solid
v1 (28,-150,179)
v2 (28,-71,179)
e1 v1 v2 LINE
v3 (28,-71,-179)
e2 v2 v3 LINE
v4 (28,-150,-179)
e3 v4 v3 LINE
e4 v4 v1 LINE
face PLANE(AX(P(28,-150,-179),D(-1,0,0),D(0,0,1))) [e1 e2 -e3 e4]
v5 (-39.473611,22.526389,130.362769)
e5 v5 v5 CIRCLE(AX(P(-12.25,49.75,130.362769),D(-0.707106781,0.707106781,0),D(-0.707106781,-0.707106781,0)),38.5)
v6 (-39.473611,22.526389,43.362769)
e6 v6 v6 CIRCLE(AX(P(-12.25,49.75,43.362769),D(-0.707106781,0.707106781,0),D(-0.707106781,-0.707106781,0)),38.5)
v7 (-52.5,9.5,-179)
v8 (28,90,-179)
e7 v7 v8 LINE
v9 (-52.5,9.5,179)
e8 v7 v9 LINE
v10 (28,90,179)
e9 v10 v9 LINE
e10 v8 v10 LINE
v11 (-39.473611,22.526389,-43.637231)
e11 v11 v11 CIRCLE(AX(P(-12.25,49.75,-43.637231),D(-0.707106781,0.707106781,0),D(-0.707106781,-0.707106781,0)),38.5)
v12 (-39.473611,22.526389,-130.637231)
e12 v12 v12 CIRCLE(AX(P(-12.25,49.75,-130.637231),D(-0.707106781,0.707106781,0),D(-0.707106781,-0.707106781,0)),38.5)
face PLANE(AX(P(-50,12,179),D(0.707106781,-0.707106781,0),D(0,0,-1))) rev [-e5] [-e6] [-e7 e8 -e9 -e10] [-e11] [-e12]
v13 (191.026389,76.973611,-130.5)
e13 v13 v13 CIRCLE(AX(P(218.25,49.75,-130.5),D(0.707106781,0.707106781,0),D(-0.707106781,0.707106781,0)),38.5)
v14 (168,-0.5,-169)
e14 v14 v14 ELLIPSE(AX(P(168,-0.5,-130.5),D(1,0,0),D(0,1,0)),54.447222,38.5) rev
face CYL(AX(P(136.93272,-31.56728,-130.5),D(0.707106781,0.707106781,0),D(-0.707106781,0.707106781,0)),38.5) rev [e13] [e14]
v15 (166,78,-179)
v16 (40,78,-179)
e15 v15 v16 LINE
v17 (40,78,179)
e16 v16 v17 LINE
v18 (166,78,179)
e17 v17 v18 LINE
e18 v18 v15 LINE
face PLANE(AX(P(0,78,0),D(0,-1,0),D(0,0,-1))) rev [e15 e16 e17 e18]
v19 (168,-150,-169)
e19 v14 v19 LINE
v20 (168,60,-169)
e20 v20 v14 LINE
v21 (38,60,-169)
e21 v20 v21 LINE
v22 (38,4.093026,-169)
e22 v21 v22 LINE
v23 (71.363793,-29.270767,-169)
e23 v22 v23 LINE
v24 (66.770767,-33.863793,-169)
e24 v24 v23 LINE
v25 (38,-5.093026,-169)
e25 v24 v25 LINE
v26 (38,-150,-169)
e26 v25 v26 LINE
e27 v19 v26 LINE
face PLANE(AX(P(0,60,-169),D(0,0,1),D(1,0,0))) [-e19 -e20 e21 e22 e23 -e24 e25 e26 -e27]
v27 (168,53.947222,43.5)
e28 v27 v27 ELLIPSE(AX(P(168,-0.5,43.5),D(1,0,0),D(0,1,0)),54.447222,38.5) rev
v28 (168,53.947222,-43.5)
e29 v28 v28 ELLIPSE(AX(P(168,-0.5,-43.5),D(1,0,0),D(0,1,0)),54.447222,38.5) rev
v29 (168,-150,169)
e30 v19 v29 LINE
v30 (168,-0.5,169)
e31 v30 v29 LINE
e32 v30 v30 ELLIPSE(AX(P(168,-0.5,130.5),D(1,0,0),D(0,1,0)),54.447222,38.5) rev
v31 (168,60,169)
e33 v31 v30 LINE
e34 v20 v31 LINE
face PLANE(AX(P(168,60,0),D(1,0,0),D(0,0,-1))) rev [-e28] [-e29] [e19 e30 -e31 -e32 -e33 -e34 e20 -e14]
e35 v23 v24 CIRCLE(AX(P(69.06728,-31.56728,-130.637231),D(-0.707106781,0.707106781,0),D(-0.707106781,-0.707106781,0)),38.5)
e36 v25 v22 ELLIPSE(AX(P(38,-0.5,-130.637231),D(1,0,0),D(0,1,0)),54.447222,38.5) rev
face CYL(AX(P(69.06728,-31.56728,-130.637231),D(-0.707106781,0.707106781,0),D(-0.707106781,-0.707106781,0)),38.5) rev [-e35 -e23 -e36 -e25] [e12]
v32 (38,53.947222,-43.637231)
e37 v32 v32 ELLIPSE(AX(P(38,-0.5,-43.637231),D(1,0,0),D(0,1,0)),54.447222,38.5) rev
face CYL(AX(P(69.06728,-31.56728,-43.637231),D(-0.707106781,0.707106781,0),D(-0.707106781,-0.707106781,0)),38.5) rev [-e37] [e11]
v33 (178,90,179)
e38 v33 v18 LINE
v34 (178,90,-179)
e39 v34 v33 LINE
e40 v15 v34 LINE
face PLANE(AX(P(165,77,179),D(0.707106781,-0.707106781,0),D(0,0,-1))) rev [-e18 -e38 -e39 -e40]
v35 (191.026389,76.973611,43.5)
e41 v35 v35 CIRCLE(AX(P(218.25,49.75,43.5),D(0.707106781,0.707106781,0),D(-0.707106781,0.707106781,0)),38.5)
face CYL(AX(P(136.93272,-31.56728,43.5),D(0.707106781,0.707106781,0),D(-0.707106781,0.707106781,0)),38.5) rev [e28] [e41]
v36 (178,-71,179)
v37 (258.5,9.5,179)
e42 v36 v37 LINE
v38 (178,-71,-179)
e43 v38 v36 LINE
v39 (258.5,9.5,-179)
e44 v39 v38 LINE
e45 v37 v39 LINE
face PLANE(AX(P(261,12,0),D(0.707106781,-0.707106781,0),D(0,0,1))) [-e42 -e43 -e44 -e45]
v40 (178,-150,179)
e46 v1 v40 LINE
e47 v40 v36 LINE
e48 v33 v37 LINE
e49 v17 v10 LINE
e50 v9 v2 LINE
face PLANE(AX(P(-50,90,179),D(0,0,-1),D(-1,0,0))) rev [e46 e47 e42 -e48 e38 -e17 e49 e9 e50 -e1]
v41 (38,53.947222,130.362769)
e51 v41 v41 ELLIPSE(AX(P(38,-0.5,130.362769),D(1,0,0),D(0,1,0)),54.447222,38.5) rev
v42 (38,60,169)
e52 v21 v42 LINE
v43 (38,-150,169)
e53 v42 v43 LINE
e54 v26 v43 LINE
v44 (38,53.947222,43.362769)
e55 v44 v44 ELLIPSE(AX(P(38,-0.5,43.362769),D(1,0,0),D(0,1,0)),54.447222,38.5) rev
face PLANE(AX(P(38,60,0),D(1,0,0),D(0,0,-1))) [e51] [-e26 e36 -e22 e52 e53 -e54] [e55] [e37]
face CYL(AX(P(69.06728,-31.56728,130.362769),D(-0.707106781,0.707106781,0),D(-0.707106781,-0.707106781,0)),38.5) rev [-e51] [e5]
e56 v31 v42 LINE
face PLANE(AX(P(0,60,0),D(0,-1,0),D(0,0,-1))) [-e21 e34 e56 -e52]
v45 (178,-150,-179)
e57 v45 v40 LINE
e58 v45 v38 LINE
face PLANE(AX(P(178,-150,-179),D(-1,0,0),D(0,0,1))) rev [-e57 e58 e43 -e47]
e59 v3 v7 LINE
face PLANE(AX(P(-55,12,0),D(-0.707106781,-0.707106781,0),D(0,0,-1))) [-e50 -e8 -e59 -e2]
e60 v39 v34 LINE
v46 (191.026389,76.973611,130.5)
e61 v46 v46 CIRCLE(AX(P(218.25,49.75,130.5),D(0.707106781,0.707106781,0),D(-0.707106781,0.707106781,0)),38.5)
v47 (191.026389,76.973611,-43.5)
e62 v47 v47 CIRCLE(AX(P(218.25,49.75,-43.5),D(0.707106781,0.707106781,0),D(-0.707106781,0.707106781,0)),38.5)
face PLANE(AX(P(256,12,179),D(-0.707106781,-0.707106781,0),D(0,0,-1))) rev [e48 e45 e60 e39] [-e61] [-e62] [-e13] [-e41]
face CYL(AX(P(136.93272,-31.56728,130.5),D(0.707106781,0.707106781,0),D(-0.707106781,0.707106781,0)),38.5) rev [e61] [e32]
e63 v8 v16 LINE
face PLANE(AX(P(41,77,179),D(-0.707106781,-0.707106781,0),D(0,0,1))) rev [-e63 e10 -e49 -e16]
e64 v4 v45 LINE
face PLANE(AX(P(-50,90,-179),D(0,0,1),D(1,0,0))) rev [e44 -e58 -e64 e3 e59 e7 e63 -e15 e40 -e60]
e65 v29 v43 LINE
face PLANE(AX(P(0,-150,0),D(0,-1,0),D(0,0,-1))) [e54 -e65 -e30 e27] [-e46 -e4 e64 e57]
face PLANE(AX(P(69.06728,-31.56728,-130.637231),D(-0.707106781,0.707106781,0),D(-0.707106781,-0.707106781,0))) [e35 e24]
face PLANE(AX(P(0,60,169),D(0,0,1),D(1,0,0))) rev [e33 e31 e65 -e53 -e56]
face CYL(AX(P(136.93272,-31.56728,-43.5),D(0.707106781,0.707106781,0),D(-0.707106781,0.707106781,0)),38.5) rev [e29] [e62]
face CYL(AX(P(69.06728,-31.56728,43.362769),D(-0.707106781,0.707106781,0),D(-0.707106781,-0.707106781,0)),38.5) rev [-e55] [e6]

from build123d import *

# Parameters (mm, degrees)
SKETCH1_W           = 100
SKETCH1_H           = 358
BOSS_EXTRUDE1_DEPTH = 90
CHAMFER1_START      = -100
CHAMFER1_OUTLINE_W  = 113
CHAMFER1_OUTLINE_H  = 358
CHAMFER1_DEPTH      = 56.159379566
SKETCH3_W           = 358
SKETCH3_H           = 90
BOSS_EXTRUDE2_DEPTH = 53
SKETCH4_W           = 150
SKETCH4_H           = 358
BOSS_EXTRUDE3_DEPTH = 150
SKETCH5_W           = 78
SKETCH5_H           = 358
CUT_EXTRUDE2_DEPTH  = 12
CHAMFER3_SIZE       = 83
SKETCH6_W           = 124
SKETCH6_H           = 358
CUT_EXTRUDE3_DEPTH  = 12
CHAMFER4_SIZE       = 13
SKETCH7_R           = 38.5
CUT_EXTRUDE4_DEPTH  = 115
SKETCH8_R           = 38.5
CUT_EXTRUDE5_DEPTH  = 115
SKETCH9_W           = 130
SKETCH9_H           = 338
CUT_EXTRUDE6_DEPTH  = 210


with BuildPart() as part:
    # Sketch1 → Boss-Extrude1 (new body)
    with BuildSketch(Plane(origin=(0, 0, 0), x_dir=(1, 0, 0), z_dir=(0, 1, 0))):
        Rectangle(SKETCH1_W, SKETCH1_H)
    extrude(amount=BOSS_EXTRUDE1_DEPTH)

    # Chamfer1: read off the stored shape, not the designer's step
    # Chamfer1 outline → Chamfer1 (cut)
    with BuildSketch(Plane(origin=(0, 0, 0), x_dir=(0.7071067811865474, 0.7071067811865477, 0), z_dir=(0.7071067811865476, -0.7071067811865476, 0)).offset(CHAMFER1_START)):
        with Locations((28.5, 0)):
            Rectangle(CHAMFER1_OUTLINE_W, CHAMFER1_OUTLINE_H)
    extrude(amount=CHAMFER1_DEPTH, mode=Mode.SUBTRACT)

    # Sketch3 → Boss-Extrude2 (add)
    with BuildSketch(Plane(origin=(50, 0, 0), x_dir=(0, 0, -1), z_dir=(1, 0, 0))):
        with Locations((0, 45)):
            Rectangle(SKETCH3_W, SKETCH3_H)
    extrude(amount=BOSS_EXTRUDE2_DEPTH)

    # Mirror2: part across plane


with BuildPart() as part_1:
    add(part.part)
    add(part.part.mirror(Plane(origin=(103, 0, 0), x_dir=(0, 0, 1), z_dir=(1, 0, 0))))

    # Sketch4 → Boss-Extrude3 (add)
    with BuildSketch(Plane.XZ):
        with Locations((103, 0)):
            Rectangle(SKETCH4_W, SKETCH4_H)
    extrude(amount=BOSS_EXTRUDE3_DEPTH)

    # Sketch5 → Cut-Extrude2 (cut)
    with BuildSketch(Plane.XZ):
        with Locations((-11, 0)):
            Rectangle(SKETCH5_W, SKETCH5_H)
        with Locations((217, 0)):
            Rectangle(SKETCH5_W, SKETCH5_H)
    extrude(amount=-CUT_EXTRUDE2_DEPTH, mode=Mode.SUBTRACT)

    # Chamfer3
    # the kernel refuses this chamfer: 83 mm, written as the material it adds along each edge
    with BuildSketch(Plane(origin=(178, 12, 179), x_dir=(0, -1, 0), z_dir=(0, 0, -1))) as chamfer3_piece_1_section:
        Polygon((CHAMFER3_SIZE, 0), (0, -CHAMFER3_SIZE), (0, 0), align=None)
    chamfer3_piece_1 = extrude(amount=358, mode=Mode.PRIVATE)
    chamfer3_piece_1 = split(chamfer3_piece_1, bisect_by=Plane(origin=(217, 51, 179), z_dir=(-0.7071067811865476, -0.7071067811865476, 0)), keep=Keep.TOP, mode=Mode.PRIVATE)
    add(chamfer3_piece_1)
    with BuildSketch(Plane(origin=(28, 12, 179), x_dir=(-1, 0, 0), z_dir=(0, 0, -1))) as chamfer3_piece_2_section:
        Polygon((CHAMFER3_SIZE, 0), (0, -CHAMFER3_SIZE), (0, 0), align=None)
    chamfer3_piece_2 = extrude(amount=358, mode=Mode.PRIVATE)
    chamfer3_piece_2 = split(chamfer3_piece_2, bisect_by=Plane(origin=(-11, 51, 179), z_dir=(0.7071067811865476, -0.7071067811865476, 0)), keep=Keep.TOP, mode=Mode.PRIVATE)
    add(chamfer3_piece_2)

    # Sketch6 → Cut-Extrude3 (cut)
    with BuildSketch(Plane(origin=(0, 90, 0), x_dir=(1, 0, 0), z_dir=(0, 1, 0))):
        with Locations((103, 0)):
            Rectangle(SKETCH6_W, SKETCH6_H)
    extrude(amount=-CUT_EXTRUDE3_DEPTH, mode=Mode.SUBTRACT)

    # Chamfer4
    # the kernel refuses this chamfer: 13 mm, written as the material it takes off along each edge
    with BuildSketch(Plane(origin=(165, 90, 212.431878844), x_dir=(0, -1, 0), z_dir=(0, 0, -1))) as chamfer4_piece_1_section:
        Polygon((CHAMFER4_SIZE, 0), (0, -CHAMFER4_SIZE), (0, 0), align=None)
    chamfer4_piece_1 = extrude(amount=424.863757687, mode=Mode.PRIVATE)
    chamfer4_piece_1 = split(chamfer4_piece_1, bisect_by=Plane(origin=(165, 78, 212.431878844), z_dir=(0, 1, 0)), keep=Keep.TOP, mode=Mode.PRIVATE)
    add(chamfer4_piece_1, mode=Mode.SUBTRACT)
    with BuildSketch(Plane(origin=(41, 90, -212.431878844), x_dir=(-1, 0, 0), z_dir=(0, 0, 1))) as chamfer4_piece_2_section:
        Polygon((CHAMFER4_SIZE, 0), (0, CHAMFER4_SIZE), (0, 0), align=None)
    chamfer4_piece_2 = extrude(amount=424.863757687, mode=Mode.PRIVATE)
    chamfer4_piece_2 = split(chamfer4_piece_2, bisect_by=Plane(origin=(41, 78, -212.431878844), z_dir=(0, 1, 0)), keep=Keep.TOP, mode=Mode.PRIVATE)
    add(chamfer4_piece_2, mode=Mode.SUBTRACT)

    # Sketch7 → Cut-Extrude4 (cut)
    with BuildSketch(Plane(origin=(-31, 31, 0), x_dir=(0, 0, 1), z_dir=(-0.7071067811865477, 0.7071067811865475, 0))):
        with Locations(Location((130.362769157, 26.516504294, 0), (0, 0, 270))):
            Circle(SKETCH7_R)
        with Locations(Location((43.362769157, 26.516504294, 0), (0, 0, 270))):
            Circle(SKETCH7_R)
        with Locations(Location((-43.637230843, 26.516504294, 0), (0, 0, 270))):
            Circle(SKETCH7_R)
        with Locations(Location((-130.637230843, 26.516504294, 0), (0, 0, 270))):
            Circle(SKETCH7_R)
    extrude(amount=-CUT_EXTRUDE4_DEPTH, mode=Mode.SUBTRACT)

    # Sketch8 → Cut-Extrude5 (cut)
    with BuildSketch(Plane(origin=(134, 134, 0), x_dir=(0, 0, -1), z_dir=(0.7071067811865477, 0.7071067811865475, 0))):
        with Locations(Location((-130.5, -119.14749263, 0), (0, 0, 90))):
            Circle(SKETCH8_R)
        with Locations(Location((-43.5, -119.14749263, 0), (0, 0, 90))):
            Circle(SKETCH8_R)
        with Locations(Location((43.5, -119.14749263, 0), (0, 0, 90))):
            Circle(SKETCH8_R)
        with Locations(Location((130.5, -119.14749263, 0), (0, 0, 90))):
            Circle(SKETCH8_R)
    extrude(amount=-CUT_EXTRUDE5_DEPTH, mode=Mode.SUBTRACT)

    # Sketch9 → Cut-Extrude6 (cut)
    with BuildSketch(Plane.XZ.offset(150)):
        with Locations((103, 0)):
            Rectangle(SKETCH9_W, SKETCH9_H)
    extrude(amount=-CUT_EXTRUDE6_DEPTH, mode=Mode.SUBTRACT)


solid = part_1.part
